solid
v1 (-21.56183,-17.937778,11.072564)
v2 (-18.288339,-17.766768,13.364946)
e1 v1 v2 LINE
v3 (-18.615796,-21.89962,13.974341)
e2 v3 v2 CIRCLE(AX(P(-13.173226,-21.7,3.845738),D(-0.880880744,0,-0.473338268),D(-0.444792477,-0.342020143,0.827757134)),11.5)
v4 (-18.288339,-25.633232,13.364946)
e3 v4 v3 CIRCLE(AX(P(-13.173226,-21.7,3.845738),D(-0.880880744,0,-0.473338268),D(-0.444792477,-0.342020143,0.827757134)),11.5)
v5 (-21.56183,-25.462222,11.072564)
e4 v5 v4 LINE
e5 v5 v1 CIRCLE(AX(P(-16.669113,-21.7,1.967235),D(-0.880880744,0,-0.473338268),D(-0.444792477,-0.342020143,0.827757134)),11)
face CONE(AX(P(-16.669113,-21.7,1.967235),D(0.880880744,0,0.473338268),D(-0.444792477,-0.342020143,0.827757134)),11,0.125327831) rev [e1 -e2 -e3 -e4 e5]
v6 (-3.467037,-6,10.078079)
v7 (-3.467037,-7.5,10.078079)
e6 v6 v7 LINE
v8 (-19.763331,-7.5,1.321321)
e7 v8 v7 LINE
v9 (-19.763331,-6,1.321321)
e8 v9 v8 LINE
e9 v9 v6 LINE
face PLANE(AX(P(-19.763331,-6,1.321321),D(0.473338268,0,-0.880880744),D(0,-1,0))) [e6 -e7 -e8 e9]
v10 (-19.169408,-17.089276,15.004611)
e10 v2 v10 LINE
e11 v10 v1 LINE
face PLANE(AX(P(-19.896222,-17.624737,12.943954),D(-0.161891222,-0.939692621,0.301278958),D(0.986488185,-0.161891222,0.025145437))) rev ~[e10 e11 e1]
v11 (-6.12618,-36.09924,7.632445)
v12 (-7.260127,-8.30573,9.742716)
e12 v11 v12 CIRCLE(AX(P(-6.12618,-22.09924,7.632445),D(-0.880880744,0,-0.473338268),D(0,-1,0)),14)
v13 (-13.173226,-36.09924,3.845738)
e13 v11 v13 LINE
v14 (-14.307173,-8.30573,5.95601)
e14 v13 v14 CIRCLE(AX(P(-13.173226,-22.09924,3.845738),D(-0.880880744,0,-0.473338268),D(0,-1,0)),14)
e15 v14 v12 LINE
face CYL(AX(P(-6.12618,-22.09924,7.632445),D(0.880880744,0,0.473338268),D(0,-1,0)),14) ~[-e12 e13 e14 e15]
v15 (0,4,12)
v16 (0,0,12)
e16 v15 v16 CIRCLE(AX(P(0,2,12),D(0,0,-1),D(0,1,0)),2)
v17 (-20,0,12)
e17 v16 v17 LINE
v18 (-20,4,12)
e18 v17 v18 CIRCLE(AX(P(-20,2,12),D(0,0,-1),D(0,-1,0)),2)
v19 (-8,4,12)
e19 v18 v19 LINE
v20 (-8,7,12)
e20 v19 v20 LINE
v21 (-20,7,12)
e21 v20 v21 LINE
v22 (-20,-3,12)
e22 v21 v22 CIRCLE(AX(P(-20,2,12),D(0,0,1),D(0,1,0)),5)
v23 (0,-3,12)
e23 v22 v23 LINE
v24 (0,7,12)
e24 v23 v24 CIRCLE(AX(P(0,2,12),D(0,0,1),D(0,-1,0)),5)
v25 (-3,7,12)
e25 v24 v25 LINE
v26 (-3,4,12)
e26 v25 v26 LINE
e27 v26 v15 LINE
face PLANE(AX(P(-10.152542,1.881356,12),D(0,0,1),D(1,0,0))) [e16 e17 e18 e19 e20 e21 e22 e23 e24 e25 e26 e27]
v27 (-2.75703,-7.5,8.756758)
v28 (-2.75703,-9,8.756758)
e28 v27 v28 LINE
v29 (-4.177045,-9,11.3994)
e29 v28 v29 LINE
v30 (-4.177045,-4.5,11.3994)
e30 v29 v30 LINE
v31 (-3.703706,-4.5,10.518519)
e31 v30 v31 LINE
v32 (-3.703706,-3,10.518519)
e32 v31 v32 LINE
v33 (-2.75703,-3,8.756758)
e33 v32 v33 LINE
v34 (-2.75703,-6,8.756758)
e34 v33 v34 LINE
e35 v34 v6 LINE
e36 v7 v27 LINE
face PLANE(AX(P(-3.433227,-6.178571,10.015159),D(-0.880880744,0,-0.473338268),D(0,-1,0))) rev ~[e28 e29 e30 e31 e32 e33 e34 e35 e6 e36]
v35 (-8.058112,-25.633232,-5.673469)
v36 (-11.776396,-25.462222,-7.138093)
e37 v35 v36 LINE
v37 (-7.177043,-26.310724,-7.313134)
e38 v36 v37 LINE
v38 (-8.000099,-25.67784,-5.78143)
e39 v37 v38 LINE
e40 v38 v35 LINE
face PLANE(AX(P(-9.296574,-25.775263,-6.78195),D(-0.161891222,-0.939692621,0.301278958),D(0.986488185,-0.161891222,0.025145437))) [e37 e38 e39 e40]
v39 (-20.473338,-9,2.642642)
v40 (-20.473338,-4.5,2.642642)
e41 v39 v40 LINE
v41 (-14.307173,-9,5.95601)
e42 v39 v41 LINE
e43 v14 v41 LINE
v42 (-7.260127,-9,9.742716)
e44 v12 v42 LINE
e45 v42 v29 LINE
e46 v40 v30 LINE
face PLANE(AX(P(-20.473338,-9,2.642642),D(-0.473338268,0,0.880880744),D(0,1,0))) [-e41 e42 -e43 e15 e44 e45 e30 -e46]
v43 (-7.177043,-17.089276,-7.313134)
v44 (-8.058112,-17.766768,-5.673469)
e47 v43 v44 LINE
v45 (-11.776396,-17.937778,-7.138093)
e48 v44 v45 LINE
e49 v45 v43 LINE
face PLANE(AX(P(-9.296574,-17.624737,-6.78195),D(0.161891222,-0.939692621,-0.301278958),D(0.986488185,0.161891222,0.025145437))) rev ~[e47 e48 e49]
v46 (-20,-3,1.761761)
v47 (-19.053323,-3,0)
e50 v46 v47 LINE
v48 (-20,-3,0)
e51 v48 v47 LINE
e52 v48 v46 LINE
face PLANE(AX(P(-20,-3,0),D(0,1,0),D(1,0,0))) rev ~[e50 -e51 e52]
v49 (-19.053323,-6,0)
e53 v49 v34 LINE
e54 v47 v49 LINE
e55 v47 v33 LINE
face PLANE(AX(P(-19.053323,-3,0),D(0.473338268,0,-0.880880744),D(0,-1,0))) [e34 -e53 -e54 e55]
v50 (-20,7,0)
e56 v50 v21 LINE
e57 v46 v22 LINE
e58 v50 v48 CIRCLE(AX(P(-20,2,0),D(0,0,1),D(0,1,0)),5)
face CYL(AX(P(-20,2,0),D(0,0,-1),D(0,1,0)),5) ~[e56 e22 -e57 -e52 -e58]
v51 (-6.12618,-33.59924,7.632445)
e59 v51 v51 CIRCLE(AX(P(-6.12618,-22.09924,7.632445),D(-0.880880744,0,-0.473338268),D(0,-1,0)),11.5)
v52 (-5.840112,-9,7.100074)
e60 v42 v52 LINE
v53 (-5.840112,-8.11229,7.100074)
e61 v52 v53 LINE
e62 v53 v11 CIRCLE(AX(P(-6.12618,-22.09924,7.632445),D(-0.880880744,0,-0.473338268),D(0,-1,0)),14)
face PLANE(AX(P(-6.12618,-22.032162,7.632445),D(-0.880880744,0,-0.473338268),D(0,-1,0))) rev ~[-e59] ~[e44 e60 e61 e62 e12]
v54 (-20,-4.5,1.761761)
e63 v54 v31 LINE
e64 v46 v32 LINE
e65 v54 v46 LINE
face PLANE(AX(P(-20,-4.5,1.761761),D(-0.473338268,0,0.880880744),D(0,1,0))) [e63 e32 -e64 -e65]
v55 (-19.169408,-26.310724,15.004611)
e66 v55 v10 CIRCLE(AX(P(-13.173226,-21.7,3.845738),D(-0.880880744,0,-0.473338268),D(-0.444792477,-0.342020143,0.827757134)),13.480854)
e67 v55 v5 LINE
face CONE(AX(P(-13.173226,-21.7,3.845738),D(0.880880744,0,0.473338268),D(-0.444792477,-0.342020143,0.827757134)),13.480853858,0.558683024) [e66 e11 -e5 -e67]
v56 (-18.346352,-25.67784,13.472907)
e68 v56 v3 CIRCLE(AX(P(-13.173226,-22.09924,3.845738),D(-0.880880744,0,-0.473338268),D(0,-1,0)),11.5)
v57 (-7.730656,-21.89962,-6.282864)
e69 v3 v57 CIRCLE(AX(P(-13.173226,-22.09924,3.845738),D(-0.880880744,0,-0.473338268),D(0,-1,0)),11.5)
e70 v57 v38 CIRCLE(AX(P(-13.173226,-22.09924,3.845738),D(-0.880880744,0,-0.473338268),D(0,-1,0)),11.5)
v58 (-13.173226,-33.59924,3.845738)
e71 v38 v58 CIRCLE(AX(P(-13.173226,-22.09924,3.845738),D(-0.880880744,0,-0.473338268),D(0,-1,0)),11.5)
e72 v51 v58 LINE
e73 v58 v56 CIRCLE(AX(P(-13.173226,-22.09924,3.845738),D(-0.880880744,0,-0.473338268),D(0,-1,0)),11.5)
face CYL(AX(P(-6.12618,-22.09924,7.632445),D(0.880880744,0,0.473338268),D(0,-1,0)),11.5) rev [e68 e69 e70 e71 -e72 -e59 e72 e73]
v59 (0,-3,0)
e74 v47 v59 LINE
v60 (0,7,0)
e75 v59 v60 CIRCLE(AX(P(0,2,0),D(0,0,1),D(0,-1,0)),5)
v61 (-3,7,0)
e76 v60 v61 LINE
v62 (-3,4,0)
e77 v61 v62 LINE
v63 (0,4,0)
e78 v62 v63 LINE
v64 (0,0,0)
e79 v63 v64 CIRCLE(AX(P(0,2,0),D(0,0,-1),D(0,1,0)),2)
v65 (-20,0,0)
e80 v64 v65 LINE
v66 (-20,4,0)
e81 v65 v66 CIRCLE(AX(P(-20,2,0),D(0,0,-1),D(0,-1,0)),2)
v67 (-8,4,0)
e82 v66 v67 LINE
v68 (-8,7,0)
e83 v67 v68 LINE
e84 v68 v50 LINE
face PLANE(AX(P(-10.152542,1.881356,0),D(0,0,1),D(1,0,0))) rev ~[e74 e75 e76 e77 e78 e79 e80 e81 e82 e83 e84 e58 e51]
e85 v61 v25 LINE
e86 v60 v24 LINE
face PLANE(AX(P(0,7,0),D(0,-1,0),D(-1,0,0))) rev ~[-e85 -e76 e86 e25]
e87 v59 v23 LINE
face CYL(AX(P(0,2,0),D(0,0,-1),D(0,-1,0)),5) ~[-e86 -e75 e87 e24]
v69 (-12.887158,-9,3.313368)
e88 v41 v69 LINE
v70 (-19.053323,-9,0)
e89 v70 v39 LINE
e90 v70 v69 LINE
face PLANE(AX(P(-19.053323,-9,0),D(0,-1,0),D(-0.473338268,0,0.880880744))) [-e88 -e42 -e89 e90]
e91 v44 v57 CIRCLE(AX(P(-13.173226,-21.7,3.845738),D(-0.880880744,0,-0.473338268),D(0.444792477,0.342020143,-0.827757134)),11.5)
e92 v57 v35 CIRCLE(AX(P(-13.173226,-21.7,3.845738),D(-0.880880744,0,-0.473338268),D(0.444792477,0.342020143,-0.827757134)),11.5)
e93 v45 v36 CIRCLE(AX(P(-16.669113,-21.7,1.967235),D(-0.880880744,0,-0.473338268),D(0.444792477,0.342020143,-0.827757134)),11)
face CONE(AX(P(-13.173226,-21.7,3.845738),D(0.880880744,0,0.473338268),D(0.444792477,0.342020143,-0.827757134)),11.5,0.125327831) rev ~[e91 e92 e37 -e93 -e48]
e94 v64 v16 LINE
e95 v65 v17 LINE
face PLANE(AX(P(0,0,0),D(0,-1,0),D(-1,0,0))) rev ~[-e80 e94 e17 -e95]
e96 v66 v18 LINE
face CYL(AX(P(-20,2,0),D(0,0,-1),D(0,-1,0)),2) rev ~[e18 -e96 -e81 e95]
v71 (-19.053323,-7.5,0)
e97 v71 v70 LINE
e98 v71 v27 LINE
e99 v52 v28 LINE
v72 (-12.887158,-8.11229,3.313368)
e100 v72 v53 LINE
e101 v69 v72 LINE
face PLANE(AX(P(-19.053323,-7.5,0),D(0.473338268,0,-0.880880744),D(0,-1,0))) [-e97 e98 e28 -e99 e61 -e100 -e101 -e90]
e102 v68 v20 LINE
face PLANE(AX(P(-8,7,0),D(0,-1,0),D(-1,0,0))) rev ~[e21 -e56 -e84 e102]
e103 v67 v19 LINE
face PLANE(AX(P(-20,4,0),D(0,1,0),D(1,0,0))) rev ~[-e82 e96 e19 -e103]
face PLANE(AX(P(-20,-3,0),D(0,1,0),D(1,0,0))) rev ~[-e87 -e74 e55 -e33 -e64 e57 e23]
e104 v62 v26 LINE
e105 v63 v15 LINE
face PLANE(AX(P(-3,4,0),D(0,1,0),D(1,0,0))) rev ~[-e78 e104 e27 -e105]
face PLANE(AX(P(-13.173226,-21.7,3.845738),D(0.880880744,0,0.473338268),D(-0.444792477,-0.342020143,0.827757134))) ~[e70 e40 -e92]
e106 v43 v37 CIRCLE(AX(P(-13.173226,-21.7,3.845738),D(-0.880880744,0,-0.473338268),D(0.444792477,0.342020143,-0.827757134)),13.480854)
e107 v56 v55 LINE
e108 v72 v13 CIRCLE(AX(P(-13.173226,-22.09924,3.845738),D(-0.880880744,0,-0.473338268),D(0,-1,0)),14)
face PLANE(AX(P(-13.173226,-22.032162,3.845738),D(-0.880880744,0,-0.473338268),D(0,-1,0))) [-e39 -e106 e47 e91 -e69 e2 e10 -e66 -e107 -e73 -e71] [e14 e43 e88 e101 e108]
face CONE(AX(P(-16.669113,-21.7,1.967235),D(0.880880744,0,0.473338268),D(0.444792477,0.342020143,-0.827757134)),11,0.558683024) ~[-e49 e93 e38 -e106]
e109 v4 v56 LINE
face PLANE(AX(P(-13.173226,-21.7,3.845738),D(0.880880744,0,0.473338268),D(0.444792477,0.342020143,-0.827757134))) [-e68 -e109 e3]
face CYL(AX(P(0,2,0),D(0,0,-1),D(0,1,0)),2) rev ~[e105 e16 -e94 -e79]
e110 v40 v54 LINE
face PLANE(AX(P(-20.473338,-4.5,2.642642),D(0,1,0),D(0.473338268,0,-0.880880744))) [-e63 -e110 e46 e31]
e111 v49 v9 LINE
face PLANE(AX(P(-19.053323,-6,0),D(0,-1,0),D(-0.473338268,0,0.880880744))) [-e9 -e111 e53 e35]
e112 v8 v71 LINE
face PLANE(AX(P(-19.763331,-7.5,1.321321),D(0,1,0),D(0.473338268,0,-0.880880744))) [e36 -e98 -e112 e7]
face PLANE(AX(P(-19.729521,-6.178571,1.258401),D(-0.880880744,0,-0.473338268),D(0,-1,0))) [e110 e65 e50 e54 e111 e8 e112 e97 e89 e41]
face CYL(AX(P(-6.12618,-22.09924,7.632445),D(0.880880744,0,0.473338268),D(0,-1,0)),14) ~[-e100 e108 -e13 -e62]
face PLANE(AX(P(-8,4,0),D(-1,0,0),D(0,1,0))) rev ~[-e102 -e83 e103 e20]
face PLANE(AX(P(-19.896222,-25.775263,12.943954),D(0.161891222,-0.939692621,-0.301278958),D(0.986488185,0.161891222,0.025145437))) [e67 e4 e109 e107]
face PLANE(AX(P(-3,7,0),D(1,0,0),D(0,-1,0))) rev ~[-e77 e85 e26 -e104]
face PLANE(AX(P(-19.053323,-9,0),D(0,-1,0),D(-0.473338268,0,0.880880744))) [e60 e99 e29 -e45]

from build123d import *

# Parameters (mm, degrees)
F1_DEPTH       = 12
F5_DEPTH       = 18.5
F7_R           = 11.5
F8_DEPTH       = 8
F11_ANGLE_BACK = 20
F11_ANGLE      = 40


with BuildPart() as f1:
    # F0 (on Top) → F1 (new body)
    with BuildSketch(Plane.XY):
        with BuildLine():
            Line((0, 0), (-20, 0))
            ThreePointArc((-20, 0), (-22, 2), (-20, 4))
            Line((-20, 4), (-8, 4))
            Line((-8, 4), (-8, 7))
            Line((-8, 7), (-20, 7))
            ThreePointArc((-20, 7), (-25, 2), (-20, -3))
            Line((-20, -3), (0, -3))
            ThreePointArc((0, -3), (5, 2), (0, 7))
            Line((0, 7), (-3, 7))
            Line((-3, 7), (-3, 4))
            Line((-3, 4), (0, 4))
            ThreePointArc((0, 4), (2, 2), (0, 0))
        make_face()
    extrude(amount=F1_DEPTH)

    # F4 (on line) → F5 (join)
    with BuildSketch(Plane(origin=(-14.7844431916, 0, -7.9443702008), x_dir=(0, -1, 0), z_dir=(-0.8808807435, 0, -0.4733382677))):
        Polygon((3, 11.0186671228), (3, 9.0186671228), (6, 9.0186671228), (6, 10.5186671228), (7.5, 10.5186671228), (7.5, 9.0186671228), (9, 9.0186671228), (9, 12.0186671228), (4.5, 12.0186671228), (4.5, 11.0186671228), align=None)
    extrude(amount=-F5_DEPTH)

    # F7 (on offset) → F8 (join)
    with BuildSketch(Plane(origin=(-1.5712320387, 0, -0.8442961852), x_dir=(0, -1, 0), z_dir=(-0.8808807435, 0, -0.4733382677))):
        with BuildLine():
            ThreePointArc((36.0992396533, 9.6230288318), (24.609219733, 23.3961911411), (8.9992396533, 14.5616521217))
            Line((8.9992396533, 14.5616521217), (8.9992396533, 4.6844055418))
            ThreePointArc((8.9992396533, 4.6844055418), (24.609219733, -4.1501334776), (36.0992396533, 9.6230288318))
        make_face()
        with Locations((22.0992396533, 9.6230288318)):
            Circle(F7_R, mode=Mode.SUBTRACT)
        with BuildLine():
            Line((8.9992396533, 4.6844055418), (8.9992396533, 14.5616521217))
            ThreePointArc((8.9992396533, 14.5616521217), (8.0992396533, 9.6230288318), (8.9992396533, 4.6844055418))
        make_face()
    extrude(amount=F8_DEPTH)

    # F10 (on offset) → F11 (revolve)
    with BuildSketch(Plane.XZ.offset(21.7), mode=Mode.PRIVATE) as f11_sk:
        Polygon((-6.7922217721, -8.029286104), (-7.7298357056, -6.2843900851), (-11.4623919126, -7.7224527269), align=None)
        Polygon((-21.8758338022, 11.6569236308), (-18.6166158629, 13.9758670161), (-19.5542297964, 15.720763035), align=None)
    revolve(f11_sk.sketch.rotate(Axis((-15.3602525801, -21.7, 2.6705470646), (-0.8808807435, 0, -0.4733382677)), -F11_ANGLE_BACK), axis=Axis((-15.3602525801, -21.7, 2.6705470646), (-0.8808807435, 0, -0.4733382677)), revolution_arc=F11_ANGLE)


solid = f1.part
